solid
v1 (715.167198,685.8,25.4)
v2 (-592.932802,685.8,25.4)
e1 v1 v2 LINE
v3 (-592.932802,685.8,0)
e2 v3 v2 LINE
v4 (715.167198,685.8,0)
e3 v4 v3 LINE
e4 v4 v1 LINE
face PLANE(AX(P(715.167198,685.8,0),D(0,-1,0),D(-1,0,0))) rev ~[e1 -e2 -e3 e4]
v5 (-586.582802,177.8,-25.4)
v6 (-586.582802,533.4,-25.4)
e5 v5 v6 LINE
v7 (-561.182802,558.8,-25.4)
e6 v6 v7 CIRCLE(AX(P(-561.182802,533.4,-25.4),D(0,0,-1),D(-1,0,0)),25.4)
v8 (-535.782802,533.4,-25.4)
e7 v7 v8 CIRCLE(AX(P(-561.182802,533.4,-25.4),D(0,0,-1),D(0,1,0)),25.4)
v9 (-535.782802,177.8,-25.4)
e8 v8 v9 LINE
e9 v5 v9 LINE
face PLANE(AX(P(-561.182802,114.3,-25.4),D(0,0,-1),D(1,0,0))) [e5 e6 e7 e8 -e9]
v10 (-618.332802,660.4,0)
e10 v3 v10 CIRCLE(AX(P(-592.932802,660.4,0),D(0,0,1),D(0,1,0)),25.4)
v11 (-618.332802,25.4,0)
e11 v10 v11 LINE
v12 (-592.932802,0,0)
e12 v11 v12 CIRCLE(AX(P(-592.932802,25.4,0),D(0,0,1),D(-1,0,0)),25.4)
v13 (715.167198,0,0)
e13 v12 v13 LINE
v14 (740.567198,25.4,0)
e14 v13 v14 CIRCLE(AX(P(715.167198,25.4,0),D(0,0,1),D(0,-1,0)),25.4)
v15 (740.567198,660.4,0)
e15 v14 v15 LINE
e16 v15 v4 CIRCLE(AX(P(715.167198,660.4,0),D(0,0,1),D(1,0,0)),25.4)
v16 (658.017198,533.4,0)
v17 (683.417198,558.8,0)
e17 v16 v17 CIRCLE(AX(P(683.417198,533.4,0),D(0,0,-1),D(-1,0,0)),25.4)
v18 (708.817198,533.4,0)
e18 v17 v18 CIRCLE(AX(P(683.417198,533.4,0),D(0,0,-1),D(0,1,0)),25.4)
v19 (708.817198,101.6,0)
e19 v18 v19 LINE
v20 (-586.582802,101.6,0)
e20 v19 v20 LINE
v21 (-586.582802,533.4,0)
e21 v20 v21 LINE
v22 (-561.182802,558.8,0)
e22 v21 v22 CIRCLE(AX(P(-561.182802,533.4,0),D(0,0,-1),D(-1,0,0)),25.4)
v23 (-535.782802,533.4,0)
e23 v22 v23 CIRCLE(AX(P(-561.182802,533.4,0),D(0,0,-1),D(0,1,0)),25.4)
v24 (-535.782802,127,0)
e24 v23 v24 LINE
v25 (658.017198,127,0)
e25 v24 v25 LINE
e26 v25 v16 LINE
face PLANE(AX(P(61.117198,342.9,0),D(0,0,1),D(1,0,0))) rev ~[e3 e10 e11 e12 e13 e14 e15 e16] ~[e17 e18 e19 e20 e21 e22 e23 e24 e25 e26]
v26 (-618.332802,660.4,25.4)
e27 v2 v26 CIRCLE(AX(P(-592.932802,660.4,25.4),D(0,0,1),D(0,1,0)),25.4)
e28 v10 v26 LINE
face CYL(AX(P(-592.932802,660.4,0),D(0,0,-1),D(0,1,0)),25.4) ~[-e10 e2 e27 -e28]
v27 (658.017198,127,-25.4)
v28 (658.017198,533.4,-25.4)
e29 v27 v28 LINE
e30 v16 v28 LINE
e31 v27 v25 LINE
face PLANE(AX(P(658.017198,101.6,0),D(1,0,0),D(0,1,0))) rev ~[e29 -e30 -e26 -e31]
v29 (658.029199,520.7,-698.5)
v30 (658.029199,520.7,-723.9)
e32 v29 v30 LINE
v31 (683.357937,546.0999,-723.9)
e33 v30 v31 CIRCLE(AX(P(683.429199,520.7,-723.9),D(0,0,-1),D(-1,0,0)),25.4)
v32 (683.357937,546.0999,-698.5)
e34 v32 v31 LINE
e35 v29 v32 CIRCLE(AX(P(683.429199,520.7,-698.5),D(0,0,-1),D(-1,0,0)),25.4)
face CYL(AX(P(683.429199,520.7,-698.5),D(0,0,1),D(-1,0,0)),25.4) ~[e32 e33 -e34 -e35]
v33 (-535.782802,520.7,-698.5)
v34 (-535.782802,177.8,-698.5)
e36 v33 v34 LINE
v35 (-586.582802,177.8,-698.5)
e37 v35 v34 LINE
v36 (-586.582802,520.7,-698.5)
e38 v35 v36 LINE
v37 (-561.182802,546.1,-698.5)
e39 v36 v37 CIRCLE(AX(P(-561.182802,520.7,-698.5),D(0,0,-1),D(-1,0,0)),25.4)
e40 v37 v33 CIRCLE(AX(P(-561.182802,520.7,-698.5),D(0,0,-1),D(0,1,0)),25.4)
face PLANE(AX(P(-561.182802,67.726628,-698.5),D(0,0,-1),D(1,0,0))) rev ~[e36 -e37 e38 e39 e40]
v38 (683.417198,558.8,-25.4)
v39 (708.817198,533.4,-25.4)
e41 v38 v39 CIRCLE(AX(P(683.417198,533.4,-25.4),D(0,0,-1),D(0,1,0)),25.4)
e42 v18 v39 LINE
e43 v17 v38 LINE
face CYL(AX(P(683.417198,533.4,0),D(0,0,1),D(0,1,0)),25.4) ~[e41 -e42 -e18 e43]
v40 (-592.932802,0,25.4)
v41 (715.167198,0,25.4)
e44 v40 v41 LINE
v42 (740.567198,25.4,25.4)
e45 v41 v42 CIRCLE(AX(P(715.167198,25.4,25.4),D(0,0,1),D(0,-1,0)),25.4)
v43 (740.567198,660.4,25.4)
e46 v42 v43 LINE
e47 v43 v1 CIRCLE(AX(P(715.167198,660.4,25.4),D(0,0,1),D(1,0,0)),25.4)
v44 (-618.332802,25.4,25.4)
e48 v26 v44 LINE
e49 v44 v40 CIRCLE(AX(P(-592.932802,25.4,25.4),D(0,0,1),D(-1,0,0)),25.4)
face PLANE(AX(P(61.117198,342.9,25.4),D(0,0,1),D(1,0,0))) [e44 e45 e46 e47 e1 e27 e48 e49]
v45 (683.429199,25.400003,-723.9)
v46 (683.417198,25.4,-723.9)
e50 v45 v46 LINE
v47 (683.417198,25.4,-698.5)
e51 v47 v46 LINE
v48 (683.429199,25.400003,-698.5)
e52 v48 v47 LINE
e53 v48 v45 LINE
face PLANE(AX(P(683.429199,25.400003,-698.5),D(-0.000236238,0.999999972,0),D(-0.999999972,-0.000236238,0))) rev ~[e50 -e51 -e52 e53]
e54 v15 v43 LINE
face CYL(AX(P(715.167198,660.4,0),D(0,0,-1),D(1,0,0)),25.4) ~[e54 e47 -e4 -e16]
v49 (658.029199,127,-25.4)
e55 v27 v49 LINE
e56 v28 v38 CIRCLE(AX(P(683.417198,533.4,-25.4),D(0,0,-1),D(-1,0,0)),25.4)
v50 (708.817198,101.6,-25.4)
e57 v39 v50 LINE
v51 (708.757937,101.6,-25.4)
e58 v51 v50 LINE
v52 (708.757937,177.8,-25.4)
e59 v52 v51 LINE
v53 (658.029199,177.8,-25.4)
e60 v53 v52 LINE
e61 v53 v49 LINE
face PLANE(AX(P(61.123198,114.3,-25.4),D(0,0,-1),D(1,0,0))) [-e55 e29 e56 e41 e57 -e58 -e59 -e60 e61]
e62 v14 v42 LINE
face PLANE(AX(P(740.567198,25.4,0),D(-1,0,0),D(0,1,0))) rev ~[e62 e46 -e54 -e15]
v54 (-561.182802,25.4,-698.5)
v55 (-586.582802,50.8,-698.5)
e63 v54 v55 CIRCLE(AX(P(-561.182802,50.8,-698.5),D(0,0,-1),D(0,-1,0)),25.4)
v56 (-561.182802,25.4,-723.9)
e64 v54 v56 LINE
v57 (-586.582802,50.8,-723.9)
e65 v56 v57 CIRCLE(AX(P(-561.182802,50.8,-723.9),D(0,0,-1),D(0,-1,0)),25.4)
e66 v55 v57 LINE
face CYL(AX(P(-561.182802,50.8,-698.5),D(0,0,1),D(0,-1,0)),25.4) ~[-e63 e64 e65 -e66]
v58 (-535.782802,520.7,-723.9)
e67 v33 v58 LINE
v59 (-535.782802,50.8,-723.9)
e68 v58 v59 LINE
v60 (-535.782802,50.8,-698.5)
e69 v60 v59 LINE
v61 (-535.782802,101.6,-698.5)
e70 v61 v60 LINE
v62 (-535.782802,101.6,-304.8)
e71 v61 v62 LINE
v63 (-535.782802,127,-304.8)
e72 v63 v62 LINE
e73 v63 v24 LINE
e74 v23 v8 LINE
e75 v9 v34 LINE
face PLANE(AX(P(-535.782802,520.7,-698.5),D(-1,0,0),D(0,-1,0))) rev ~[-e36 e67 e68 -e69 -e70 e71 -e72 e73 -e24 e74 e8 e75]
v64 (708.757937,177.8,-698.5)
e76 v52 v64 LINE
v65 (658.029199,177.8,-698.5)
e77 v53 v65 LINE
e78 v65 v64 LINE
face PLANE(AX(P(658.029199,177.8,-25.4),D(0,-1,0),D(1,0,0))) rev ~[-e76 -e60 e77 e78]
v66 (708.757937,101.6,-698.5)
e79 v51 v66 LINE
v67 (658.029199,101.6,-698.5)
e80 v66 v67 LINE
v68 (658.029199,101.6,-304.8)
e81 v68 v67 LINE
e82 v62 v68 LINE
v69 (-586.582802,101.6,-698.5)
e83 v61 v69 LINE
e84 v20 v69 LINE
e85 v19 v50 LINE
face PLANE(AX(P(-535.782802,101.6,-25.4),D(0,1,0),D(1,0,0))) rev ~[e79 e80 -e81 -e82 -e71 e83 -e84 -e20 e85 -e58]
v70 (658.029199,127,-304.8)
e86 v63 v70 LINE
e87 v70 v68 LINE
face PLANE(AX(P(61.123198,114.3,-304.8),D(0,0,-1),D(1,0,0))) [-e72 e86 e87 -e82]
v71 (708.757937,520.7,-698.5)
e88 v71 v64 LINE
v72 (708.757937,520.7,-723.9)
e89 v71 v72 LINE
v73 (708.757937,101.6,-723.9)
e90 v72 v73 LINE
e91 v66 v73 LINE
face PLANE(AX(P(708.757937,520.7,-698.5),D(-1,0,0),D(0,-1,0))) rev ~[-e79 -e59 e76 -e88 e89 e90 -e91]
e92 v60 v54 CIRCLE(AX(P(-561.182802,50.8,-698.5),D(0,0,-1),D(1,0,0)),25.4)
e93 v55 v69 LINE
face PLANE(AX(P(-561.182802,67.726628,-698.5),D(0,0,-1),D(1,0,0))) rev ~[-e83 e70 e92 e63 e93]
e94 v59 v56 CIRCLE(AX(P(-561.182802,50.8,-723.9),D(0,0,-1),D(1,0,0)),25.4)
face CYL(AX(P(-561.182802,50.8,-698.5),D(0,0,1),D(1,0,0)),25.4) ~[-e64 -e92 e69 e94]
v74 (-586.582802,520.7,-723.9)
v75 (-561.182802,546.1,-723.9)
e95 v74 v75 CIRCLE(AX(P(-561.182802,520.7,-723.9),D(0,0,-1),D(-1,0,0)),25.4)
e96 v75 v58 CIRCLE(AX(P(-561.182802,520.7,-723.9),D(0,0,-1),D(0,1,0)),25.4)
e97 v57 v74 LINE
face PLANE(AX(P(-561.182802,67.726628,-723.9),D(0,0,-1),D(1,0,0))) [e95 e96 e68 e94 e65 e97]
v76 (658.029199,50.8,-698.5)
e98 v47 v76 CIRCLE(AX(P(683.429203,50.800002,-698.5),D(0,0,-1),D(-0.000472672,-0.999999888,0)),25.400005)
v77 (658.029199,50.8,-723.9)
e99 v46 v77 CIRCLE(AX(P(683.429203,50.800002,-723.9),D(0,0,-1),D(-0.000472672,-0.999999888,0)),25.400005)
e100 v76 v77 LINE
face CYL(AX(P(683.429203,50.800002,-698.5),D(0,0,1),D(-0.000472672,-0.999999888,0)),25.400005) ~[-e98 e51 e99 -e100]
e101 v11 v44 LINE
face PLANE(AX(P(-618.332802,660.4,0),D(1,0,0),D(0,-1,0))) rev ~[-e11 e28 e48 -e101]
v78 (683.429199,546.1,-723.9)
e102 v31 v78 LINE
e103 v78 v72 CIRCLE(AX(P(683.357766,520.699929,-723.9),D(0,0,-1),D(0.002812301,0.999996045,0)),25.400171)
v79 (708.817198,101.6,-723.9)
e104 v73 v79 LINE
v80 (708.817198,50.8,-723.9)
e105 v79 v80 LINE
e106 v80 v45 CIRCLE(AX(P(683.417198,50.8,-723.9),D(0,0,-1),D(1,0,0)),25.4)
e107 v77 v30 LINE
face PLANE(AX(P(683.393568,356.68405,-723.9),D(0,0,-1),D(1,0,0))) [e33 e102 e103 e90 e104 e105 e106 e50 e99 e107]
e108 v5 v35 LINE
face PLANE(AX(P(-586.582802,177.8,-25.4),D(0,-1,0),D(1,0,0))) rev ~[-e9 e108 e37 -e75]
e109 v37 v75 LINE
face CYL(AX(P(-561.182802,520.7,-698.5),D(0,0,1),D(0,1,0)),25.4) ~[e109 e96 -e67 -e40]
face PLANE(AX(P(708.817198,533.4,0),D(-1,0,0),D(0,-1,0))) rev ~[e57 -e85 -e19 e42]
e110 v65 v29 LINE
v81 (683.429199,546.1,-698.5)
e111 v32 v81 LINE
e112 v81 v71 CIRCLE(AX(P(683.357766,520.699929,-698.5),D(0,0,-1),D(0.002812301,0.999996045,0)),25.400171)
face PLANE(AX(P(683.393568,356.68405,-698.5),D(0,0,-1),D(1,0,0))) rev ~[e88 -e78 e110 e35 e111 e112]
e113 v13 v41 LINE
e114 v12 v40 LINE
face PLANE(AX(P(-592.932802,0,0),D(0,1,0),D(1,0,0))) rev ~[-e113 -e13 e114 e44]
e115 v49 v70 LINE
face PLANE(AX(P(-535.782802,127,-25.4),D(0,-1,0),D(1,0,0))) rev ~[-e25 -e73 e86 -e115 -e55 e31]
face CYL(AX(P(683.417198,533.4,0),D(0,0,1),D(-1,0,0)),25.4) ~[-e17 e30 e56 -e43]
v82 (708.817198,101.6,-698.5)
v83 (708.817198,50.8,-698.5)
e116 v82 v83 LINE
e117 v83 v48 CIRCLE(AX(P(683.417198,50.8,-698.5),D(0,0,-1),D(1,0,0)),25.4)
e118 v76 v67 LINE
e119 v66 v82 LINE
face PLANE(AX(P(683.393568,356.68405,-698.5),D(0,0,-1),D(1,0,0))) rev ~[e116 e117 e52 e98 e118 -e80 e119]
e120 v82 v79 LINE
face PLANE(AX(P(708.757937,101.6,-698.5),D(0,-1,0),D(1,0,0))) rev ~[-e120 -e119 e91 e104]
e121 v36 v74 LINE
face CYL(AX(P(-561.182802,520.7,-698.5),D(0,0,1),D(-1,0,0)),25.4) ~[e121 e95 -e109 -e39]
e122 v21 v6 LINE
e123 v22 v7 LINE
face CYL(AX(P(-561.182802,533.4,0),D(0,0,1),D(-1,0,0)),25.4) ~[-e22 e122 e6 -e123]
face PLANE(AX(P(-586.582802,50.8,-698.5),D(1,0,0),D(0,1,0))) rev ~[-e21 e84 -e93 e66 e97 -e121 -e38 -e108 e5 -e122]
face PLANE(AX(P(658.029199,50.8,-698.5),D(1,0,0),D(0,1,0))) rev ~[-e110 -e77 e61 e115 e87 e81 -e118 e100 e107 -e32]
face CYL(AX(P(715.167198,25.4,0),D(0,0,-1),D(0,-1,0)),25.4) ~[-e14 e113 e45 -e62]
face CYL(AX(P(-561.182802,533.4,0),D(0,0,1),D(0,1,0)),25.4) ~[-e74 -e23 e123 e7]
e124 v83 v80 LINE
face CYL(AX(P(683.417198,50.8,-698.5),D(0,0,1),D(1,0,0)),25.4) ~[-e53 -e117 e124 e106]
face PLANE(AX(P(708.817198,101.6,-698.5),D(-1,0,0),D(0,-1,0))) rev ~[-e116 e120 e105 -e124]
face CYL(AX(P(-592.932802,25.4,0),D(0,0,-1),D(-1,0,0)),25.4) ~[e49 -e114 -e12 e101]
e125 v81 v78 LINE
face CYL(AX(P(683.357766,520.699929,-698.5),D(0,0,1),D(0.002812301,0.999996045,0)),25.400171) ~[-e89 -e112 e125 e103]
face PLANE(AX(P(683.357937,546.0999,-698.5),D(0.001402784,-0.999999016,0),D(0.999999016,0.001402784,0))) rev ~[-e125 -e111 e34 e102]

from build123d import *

# Parameters (mm, degrees)
F1_DEPTH  = 25.4
F2_W      = 50.8
F2_H      = 25.4
F3_DEPTH  = 25.4
F5_DEPTH  = 673.1
F4_W      = 1193.8120010341
F4_H      = 25.4
F7_DEPTH  = 25.4
F8_DEPTH  = 279.4
F9_W      = 50.728738308
F9_H      = 76.2
F10_DEPTH = 25.4
F11_W     = 50.8
F11_H     = 76.2
F12_DEPTH = 25.4


# Not quite as in the source:
# - ends of sketch curves that miss each other by under 0.0002 mm in the source are joined


with BuildPart() as f1:
    # F0 (on Top) → F1 (new body)
    with BuildSketch(Plane.XY):
        with BuildLine():
            Line((715.1671976125, 685.8), (-592.9328023875, 685.8))
            ThreePointArc((-592.9328023875, 685.8), (-610.8933146297, 678.3605122421), (-618.3328023875, 660.4))
            Line((-618.3328023875, 660.4), (-618.3328023875, 25.4))
            ThreePointArc((-618.3328023875, 25.4), (-610.8933146297, 7.4394877579), (-592.9328023875, 0))
            Line((-592.9328023875, 0), (715.1671976125, 0))
            ThreePointArc((715.1671976125, 0), (733.1277098546, 7.4394877579), (740.5671976125, 25.4))
            Line((740.5671976125, 25.4), (740.5671976125, 660.4))
            ThreePointArc((740.5671976125, 660.4), (733.1277098546, 678.3605122421), (715.1671976125, 685.8))
        make_face()
    extrude(amount=F1_DEPTH)

    # F2 (on face) → F3 (join)
    with BuildSketch(Plane(origin=(0, 0, 0), x_dir=(1, 0, 0), z_dir=(0, 0, -1))):
        with Locations((-561.1828023875, -114.3)):
            Rectangle(F2_W, F2_H)
        with BuildLine():
            Line((-535.7828023875, -127), (-586.5828023875, -127))
            Line((-586.5828023875, -127), (-586.5828023875, -533.4))
            ThreePointArc((-586.5828023875, -533.4), (-579.1433146297, -551.3605122421), (-561.1828023875, -558.8))
            ThreePointArc((-561.1828023875, -558.8), (-543.2222901454, -551.3605122421), (-535.7828023875, -533.4))
            Line((-535.7828023875, -533.4), (-535.7828023875, -127))
        make_face()
        with BuildLine():
            Line((708.8171976125, -127), (658.0171976125, -127))
            Line((658.0171976125, -127), (658.0171976125, -533.4))
            ThreePointArc((658.0171976125, -533.4), (665.4566853703, -551.3605122421), (683.4171976125, -558.8))
            ThreePointArc((683.4171976125, -558.8), (701.3777098546, -551.3605122421), (708.8171976125, -533.4))
            Line((708.8171976125, -533.4), (708.8171976125, -127))
        make_face()
        with Locations((683.4171976125, -114.3)):
            Rectangle(F2_W, F2_H)
    extrude(amount=F3_DEPTH)

    # F4 (on face) → F5 (join)
    with BuildSketch(Plane(origin=(0, 0, -25.4), x_dir=(1, 0, 0), z_dir=(0, 0, -1))):
        Polygon((-535.7828023875, -127), (-535.7828023875, -101.6), (-586.5828023875, -101.6), (-586.5828023875, -177.8), (-535.7828023875, -177.8), align=None)
        Polygon((708.7579369545, -101.6), (658.0291986465, -101.6), (658.0291986465, -127), (658.0291986465, -177.8), (708.7579369545, -177.8), align=None)
    extrude(amount=F5_DEPTH)

    # F4 (on face) → F7 (join)
    with BuildSketch(Plane(origin=(0, 0, -25.4), x_dir=(1, 0, 0), z_dir=(0, 0, -1))):
        with Locations((61.1231981295, -114.3)):
            Rectangle(F4_W, F4_H)
    extrude(amount=-F7_DEPTH)

    # F4 (on face) → F8 (join)
    with BuildSketch(Plane(origin=(0, 0, -25.4), x_dir=(1, 0, 0), z_dir=(0, 0, -1))):
        with Locations((61.1231981295, -114.3)):
            Rectangle(F4_W, F4_H)
    extrude(amount=F8_DEPTH)

    # F9 (on face) → F10 (join)
    with BuildSketch(Plane(origin=(0, 0, -698.5), x_dir=(1, 0, 0), z_dir=(0, 0, -1))):
        with BuildLine():
            Line((708.7579369545, -177.8), (658.0291986465, -177.8))
            Line((658.0291986465, -177.8), (658.0291986465, -520.7))
            ThreePointArc((658.0291986465, -520.7), (665.4435093373, -538.6352998323), (683.357937235, -546.0999000355))
            Line((683.357937235, -546.0999000355), (683.4291986465, -546.1))
            ThreePointArc((683.4291986465, -546.1), (701.3436262637, -538.6352998323), (708.7579369545, -520.7))
            Line((708.7579369545, -520.7), (708.7579369545, -177.8))
        make_face()
        with Locations((683.3935678005, -139.7)):
            Rectangle(F9_W, F9_H)
        with BuildLine():
            Line((658.0291986465, -50.8), (658.0291986465, -101.6))
            Line((658.0291986465, -101.6), (708.7579369545, -101.6))
            Line((708.7579369545, -101.6), (708.8171976125, -101.6))
            Line((708.8171976125, -101.6), (708.8171976125, -50.8))
            ThreePointArc((708.8171976125, -50.8), (701.3819523594, -32.843731265), (683.4291986452, -25.4000028351))
            Line((683.4291986452, -25.4000028351), (683.4171976125, -25.4))
            ThreePointArc((683.4171976125, -25.4), (665.4644438997, -32.843731265), (658.0291986465, -50.8))
        make_face()
    extrude(amount=F10_DEPTH)

    # F11 (on face) → F12 (join)
    with BuildSketch(Plane(origin=(0, 0, -698.5), x_dir=(1, 0, 0), z_dir=(0, 0, -1))):
        with BuildLine():
            ThreePointArc((-561.1828023875, -25.4), (-579.1433146297, -32.8394877579), (-586.5828023875, -50.8))
            Line((-586.5828023875, -50.8), (-586.5828023875, -101.6))
            Line((-586.5828023875, -101.6), (-535.7828023875, -101.6))
            Line((-535.7828023875, -101.6), (-535.7828023875, -50.8))
            ThreePointArc((-535.7828023875, -50.8), (-543.2222901454, -32.8394877579), (-561.1828023875, -25.4))
        make_face()
        with Locations((-561.1828023875, -139.7)):
            Rectangle(F11_W, F11_H)
        with BuildLine():
            Line((-535.7828023875, -177.8), (-586.5828023875, -177.8))
            Line((-586.5828023875, -177.8), (-586.5828023875, -520.7))
            ThreePointArc((-586.5828023875, -520.7), (-579.1433146297, -538.6605122421), (-561.1828023875, -546.1))
            ThreePointArc((-561.1828023875, -546.1), (-543.2222901454, -538.6605122421), (-535.7828023875, -520.7))
            Line((-535.7828023875, -520.7), (-535.7828023875, -177.8))
        make_face()
    extrude(amount=F12_DEPTH)


solid = f1.part
